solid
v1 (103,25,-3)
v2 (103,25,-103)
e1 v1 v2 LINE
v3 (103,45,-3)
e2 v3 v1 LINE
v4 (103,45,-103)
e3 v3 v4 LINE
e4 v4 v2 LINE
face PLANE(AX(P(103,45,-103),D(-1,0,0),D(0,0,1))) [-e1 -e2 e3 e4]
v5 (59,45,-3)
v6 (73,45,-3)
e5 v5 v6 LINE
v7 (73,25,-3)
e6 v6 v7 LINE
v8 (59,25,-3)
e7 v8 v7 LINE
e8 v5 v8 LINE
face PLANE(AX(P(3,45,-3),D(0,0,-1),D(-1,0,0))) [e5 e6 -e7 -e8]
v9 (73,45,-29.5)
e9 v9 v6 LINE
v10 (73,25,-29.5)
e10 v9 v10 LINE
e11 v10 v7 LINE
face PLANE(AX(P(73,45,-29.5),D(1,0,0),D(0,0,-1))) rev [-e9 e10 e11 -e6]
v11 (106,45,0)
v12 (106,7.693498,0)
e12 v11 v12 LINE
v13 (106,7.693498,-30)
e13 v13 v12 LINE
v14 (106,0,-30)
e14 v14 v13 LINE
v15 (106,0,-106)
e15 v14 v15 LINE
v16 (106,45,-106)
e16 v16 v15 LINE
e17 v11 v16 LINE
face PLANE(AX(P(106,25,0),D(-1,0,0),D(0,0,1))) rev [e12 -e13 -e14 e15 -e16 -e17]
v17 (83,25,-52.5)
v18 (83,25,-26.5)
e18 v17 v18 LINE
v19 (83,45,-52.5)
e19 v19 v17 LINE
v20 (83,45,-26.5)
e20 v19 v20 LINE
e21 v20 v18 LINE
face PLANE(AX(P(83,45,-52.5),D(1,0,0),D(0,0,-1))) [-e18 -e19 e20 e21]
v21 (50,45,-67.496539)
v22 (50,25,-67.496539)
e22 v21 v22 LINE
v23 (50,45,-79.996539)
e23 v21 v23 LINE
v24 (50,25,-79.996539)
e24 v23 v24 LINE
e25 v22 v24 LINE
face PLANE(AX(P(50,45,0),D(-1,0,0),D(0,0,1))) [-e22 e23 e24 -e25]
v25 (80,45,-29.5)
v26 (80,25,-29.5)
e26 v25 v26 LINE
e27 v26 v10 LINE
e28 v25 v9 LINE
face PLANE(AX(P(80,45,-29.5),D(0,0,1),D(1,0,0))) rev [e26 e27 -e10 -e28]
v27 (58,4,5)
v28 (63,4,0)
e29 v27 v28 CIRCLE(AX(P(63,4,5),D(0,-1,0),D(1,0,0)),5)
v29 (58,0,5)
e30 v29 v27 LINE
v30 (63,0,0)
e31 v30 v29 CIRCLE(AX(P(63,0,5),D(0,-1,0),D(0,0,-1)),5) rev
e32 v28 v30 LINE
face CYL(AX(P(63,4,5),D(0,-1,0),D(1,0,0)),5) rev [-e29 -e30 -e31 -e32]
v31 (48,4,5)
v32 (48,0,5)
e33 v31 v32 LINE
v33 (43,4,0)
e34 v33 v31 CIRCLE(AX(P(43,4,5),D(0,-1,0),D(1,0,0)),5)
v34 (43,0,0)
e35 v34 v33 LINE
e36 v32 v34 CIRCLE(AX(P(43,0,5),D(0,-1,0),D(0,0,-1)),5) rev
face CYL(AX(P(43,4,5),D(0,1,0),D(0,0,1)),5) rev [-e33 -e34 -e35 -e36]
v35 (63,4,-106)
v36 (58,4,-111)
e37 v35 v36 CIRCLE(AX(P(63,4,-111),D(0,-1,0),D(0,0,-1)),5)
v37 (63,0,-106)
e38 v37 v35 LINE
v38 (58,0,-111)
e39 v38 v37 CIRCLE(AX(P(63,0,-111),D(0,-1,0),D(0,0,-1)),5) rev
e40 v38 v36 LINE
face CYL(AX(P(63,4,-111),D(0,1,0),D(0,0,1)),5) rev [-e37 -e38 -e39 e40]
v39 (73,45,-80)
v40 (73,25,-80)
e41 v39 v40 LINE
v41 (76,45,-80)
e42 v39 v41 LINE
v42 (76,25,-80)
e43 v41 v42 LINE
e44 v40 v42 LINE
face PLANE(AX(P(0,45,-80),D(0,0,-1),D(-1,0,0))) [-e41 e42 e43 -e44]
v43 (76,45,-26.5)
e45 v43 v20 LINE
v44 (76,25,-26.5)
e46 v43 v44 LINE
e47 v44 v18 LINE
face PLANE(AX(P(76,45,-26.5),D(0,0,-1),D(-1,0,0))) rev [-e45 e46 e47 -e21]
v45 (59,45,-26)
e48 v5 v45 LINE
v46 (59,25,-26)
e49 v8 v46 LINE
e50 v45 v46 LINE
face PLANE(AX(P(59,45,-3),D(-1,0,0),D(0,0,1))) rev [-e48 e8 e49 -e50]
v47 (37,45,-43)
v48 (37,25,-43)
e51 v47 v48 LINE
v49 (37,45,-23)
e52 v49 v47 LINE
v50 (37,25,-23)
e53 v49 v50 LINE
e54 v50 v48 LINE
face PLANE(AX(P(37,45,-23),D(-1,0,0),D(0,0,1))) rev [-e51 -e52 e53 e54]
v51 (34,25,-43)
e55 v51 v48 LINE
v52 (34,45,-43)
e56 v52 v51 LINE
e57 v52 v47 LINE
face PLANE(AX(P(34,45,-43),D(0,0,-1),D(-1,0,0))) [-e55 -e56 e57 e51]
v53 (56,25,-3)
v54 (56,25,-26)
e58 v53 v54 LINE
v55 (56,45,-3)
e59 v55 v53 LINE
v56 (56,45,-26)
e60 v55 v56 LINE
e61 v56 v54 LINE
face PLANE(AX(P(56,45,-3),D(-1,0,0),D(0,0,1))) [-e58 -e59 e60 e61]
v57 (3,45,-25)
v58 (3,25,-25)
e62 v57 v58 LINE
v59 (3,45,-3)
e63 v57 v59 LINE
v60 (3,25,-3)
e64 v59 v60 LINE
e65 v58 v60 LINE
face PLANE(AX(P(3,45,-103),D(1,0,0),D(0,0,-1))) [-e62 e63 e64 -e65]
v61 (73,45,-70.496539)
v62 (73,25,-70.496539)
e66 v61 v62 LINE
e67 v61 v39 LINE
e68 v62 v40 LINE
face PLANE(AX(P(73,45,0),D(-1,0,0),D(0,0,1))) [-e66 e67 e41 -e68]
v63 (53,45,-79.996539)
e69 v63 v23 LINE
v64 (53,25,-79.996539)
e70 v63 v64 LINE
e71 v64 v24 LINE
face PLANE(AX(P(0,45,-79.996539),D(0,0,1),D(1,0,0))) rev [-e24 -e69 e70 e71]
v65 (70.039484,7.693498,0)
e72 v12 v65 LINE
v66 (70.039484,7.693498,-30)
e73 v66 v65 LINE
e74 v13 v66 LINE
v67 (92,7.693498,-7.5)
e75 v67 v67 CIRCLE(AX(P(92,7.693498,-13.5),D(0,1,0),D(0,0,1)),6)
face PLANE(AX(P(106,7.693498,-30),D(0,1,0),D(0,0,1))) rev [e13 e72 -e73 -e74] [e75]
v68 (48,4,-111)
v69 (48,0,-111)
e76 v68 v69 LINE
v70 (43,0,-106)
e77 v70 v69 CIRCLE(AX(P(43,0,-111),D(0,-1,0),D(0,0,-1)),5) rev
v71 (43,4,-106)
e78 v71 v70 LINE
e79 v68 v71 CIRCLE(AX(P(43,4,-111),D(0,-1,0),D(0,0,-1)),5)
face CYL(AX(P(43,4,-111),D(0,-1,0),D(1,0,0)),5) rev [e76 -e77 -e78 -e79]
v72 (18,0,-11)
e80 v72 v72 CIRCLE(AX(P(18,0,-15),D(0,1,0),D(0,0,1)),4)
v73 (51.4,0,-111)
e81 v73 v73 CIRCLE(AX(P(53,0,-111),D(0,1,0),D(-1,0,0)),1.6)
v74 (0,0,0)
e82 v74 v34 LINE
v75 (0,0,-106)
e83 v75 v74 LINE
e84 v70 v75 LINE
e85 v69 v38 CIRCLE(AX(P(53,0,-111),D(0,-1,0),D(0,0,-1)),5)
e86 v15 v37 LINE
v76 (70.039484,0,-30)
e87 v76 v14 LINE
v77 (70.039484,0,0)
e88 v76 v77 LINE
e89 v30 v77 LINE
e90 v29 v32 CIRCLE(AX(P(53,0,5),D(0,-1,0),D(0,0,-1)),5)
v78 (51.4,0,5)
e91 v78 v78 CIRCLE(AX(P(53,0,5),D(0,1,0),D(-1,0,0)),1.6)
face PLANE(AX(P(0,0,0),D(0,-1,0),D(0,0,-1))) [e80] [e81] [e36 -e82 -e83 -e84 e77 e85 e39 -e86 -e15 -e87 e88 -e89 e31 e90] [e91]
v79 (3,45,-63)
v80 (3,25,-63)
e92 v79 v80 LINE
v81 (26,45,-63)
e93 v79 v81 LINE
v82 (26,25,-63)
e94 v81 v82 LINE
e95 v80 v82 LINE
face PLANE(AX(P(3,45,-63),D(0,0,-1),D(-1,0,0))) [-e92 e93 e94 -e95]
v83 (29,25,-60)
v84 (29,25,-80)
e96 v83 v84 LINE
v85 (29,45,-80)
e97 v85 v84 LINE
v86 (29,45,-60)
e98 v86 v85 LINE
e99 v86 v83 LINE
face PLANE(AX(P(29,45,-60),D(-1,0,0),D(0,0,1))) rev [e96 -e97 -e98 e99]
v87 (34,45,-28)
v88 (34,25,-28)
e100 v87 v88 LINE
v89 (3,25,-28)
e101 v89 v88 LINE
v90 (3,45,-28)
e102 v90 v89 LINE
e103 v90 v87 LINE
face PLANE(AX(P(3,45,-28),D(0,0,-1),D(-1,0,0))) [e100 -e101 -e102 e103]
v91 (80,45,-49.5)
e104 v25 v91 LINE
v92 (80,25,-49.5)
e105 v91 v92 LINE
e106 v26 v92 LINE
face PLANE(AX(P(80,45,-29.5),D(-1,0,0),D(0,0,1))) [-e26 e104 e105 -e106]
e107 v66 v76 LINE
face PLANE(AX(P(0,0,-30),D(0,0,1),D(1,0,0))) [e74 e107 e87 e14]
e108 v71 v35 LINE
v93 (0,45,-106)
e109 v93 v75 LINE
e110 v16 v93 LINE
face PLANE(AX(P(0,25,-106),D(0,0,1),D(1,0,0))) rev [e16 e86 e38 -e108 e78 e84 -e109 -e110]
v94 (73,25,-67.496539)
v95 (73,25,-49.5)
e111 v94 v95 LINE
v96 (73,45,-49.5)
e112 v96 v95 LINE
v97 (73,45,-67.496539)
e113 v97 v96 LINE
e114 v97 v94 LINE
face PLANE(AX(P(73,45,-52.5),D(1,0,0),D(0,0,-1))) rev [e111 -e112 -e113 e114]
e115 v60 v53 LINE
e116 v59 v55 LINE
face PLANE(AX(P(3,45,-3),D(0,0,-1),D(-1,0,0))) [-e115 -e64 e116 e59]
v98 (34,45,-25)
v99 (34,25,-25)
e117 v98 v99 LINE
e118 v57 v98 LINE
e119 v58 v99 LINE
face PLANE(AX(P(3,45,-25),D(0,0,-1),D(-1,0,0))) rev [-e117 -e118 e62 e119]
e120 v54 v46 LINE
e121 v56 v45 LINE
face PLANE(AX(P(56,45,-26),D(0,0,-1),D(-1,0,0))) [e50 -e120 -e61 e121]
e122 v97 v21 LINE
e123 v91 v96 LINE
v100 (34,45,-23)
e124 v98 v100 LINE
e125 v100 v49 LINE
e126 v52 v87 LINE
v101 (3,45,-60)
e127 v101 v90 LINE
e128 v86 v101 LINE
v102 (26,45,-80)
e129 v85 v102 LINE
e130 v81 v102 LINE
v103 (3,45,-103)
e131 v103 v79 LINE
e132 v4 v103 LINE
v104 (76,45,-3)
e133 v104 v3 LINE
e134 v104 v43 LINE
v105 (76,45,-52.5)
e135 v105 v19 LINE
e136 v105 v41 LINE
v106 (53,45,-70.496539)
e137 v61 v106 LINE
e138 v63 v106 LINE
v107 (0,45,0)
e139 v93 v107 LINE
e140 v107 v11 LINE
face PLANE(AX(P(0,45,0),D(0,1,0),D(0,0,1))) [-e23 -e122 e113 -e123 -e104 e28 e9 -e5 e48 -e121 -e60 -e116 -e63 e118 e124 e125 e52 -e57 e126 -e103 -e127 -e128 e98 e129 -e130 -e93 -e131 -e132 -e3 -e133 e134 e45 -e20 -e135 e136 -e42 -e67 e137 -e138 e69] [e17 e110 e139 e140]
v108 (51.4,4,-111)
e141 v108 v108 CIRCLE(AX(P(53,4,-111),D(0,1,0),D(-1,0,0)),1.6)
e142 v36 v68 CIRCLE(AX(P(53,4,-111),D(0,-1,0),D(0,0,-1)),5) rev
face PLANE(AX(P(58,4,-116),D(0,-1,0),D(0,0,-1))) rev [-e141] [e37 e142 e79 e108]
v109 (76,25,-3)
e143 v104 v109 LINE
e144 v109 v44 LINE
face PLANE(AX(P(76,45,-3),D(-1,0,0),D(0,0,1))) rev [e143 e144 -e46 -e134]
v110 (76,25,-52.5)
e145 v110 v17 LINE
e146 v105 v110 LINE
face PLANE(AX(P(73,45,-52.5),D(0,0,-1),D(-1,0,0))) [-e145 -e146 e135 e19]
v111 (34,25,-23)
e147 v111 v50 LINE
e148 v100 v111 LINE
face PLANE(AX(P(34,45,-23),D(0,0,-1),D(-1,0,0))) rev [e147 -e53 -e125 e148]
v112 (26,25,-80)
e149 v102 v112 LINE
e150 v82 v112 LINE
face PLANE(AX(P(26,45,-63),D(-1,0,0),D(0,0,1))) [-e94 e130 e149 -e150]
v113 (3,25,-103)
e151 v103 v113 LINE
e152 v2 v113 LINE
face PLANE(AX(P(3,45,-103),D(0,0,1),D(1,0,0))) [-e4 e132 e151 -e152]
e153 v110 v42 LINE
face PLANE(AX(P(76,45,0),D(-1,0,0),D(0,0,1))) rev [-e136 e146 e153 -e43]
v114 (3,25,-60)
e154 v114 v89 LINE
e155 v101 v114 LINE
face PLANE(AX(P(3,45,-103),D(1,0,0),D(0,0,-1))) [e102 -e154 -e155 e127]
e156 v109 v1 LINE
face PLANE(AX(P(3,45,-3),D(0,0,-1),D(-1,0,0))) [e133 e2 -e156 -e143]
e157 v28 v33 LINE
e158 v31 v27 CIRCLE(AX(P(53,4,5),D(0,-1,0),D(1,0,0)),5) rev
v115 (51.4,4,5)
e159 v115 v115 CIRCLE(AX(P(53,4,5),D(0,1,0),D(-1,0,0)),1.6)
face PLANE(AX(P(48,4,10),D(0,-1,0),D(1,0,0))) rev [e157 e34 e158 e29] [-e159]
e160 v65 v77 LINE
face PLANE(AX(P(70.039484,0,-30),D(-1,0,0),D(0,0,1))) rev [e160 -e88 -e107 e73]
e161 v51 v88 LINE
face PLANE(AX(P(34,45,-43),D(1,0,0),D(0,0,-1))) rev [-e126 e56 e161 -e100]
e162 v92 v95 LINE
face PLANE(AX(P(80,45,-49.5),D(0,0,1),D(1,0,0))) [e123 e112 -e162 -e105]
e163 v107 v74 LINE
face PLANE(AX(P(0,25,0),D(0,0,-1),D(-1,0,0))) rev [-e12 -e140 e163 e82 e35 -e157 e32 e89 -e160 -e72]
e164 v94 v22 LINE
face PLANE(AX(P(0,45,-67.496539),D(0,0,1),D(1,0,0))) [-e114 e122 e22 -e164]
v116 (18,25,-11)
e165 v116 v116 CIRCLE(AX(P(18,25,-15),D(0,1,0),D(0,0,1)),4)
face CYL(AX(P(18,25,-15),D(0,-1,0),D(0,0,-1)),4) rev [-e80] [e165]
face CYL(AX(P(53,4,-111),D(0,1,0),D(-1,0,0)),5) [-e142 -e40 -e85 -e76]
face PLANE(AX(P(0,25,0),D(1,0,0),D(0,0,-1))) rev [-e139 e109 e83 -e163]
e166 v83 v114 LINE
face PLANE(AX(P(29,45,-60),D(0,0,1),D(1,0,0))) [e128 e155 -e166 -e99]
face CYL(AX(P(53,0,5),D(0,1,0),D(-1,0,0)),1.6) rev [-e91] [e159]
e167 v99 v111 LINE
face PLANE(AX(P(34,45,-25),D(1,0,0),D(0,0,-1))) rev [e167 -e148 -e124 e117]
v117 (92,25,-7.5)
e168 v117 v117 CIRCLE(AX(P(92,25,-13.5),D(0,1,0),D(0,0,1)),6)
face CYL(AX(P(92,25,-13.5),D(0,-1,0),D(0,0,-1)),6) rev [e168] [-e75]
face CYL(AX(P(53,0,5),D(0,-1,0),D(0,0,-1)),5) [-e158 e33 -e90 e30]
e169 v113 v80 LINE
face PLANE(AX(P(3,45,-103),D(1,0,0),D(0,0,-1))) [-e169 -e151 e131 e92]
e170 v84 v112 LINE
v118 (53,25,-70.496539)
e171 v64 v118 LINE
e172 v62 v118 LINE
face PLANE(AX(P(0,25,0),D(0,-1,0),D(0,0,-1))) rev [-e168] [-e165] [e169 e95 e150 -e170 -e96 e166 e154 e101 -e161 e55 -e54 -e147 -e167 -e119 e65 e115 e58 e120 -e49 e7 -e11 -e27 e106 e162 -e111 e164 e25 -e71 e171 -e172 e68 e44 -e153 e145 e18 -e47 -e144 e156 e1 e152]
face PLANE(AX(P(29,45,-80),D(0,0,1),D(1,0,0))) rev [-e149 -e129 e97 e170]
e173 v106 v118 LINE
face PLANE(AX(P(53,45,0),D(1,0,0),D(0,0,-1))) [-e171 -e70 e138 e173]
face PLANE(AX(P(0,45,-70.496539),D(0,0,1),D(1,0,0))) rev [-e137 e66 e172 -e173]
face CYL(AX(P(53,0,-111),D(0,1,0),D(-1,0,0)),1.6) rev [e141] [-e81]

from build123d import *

# Parameters (mm, degrees)
SKETCH2_W           = 106
SKETCH2_H           = 106
SKETCH2_R           = 4
SKETCH2_R_2         = 6
BOSS_EXTRUDE1_DEPTH = 25
SKETCH3_W           = 106
SKETCH3_H           = 106
SKETCH3_W_2         = 100
SKETCH3_H_2         = 100
BOSS_EXTRUDE2_DEPTH = 20
SKETCH5_W           = 3
SKETCH5_H           = 23
BOSS_EXTRUDE3_DEPTH = 20
SKETCH7_W           = 20
SKETCH7_H           = 3
BOSS_EXTRUDE4_DEPTH = 20
SKETCH10_W          = 10
SKETCH10_H          = 4
BOSS_EXTRUDE5_DEPTH = 10
SKETCH11_W          = 10
SKETCH11_H          = 4
BOSS_EXTRUDE6_DEPTH = 10
FILLET2_RADIUS      = 5
FILLET2_LENGTH      = 4
FILLET3_R           = 5
FILLET4_R           = 5
FILLET5_R           = 5
SKETCH13_R          = 1.6
CUT_EXTRUDE2_DEPTH  = 163.397660082
SKETCH14_W          = 35.96051594
SKETCH14_H          = 7.693498276
CUT_EXTRUDE3_DEPTH  = 30


with BuildPart() as part:
    # Sketch2 → Boss-Extrude1 (new body)
    with BuildSketch(Plane(origin=(0, 0, 0), x_dir=(1, 0, 0), z_dir=(0, 1, 0))):
        with Locations((53, 53)):
            Rectangle(SKETCH2_W, SKETCH2_H)
        with Locations(Location((18, 15, 0), (0, 0, 270))):
            Circle(SKETCH2_R, mode=Mode.SUBTRACT)
        with Locations(Location((92, 13.5, 0), (0, 0, 270))):
            Circle(SKETCH2_R_2, mode=Mode.SUBTRACT)
    extrude(amount=BOSS_EXTRUDE1_DEPTH)

    # Sketch3 → Boss-Extrude2 (add)
    with BuildSketch(Plane(origin=(0, 25, 0), x_dir=(1, 0, 0), z_dir=(0, 1, 0))):
        with Locations((53, 53)):
            Rectangle(SKETCH3_W, SKETCH3_H)
        with Locations((53, 53)):
            Rectangle(SKETCH3_W_2, SKETCH3_H_2, mode=Mode.SUBTRACT)
    extrude(amount=BOSS_EXTRUDE2_DEPTH)

    # Sketch5 → Boss-Extrude3 (add)
    with BuildSketch(Plane(origin=(0, 25, 0), x_dir=(1, 0, 0), z_dir=(0, 1, 0))):
        Polygon((3, 28), (3, 25), (34, 25), (34, 23), (37, 23), (37, 43), (34, 43), (34, 28), align=None)
        Polygon((83, 52.5), (83, 26.5), (76, 26.5), (76, 3), (73, 3), (73, 29.5), (80, 29.5), (80, 49.5), (73, 49.5), (73, 52.5), align=None)
        Polygon((3, 63), (3, 60), (29, 60), (29, 80), (26, 80), (26, 63), align=None)
        with Locations((57.5, 14.5)):
            Rectangle(SKETCH5_W, SKETCH5_H)
    extrude(amount=BOSS_EXTRUDE3_DEPTH)

    # Sketch7 → Boss-Extrude4 (add)
    with BuildSketch(Plane(origin=(0, 25, 0), x_dir=(1, 0, 0), z_dir=(0, 1, 0))):
        Polygon((50, 67.496539), (53, 67.496539), (53, 70.496539), (53, 79.996539), (50, 79.996539), align=None)
        with Locations((63, 68.996539)):
            Rectangle(SKETCH7_W, SKETCH7_H)
        Polygon((73, 67.496539), (73, 52.5), (76, 52.5), (76, 80), (73, 80), (73, 70.496539), align=None)
    extrude(amount=BOSS_EXTRUDE4_DEPTH)

    # Sketch10 → Boss-Extrude5 (add)
    with BuildSketch(Plane.XY):
        with Locations((53, 2)):
            Rectangle(SKETCH10_W, SKETCH10_H)
    extrude(amount=BOSS_EXTRUDE5_DEPTH)

    # Sketch11 → Boss-Extrude6 (add)
    with BuildSketch(Plane(origin=(0, 0, -106), x_dir=(-1, 0, 0), z_dir=(0, 0, -1))):
        with Locations((-53, 2)):
            Rectangle(SKETCH11_W, SKETCH11_H)
    extrude(amount=BOSS_EXTRUDE6_DEPTH)

    # Fillet2: full round fillet: the end face becomes a half cylinder, R = half its width
    fillet2_face = Plane((53, 2, -116), x_dir=(0, -1, 0), z_dir=(0, 0, -1))  # on the end face: x along it, z out of the body
    fillet2_slab = fillet2_face.offset(-FILLET2_RADIUS / 2) * Box(FILLET2_LENGTH, 2 * FILLET2_RADIUS, FILLET2_RADIUS, mode=Mode.PRIVATE)  # the body's end, R deep
    fillet2_round = Plane((53, 2, -111), x_dir=(0, 0, -1), z_dir=(0, -1, 0)) * Cylinder(FILLET2_RADIUS, FILLET2_LENGTH, mode=Mode.PRIVATE)  # its axis R under the face
    add(fillet2_slab - fillet2_round, mode=Mode.SUBTRACT)

    # Fillet3
    fillet3_edges = [part.edges().sort_by_distance(p)[0] for p in [
        (48, 2, -106),
        (58, 2, -106),
    ]]
    fillet(fillet3_edges, radius=FILLET3_R - 0.0001)  # a hair under: the kernel refuses the full size

    # Fillet4
    fillet4_edges = [part.edges().sort_by_distance(p)[0] for p in [
        (48, 2, 0),
        (58, 2, 0),
    ]]
    fillet(fillet4_edges, radius=FILLET4_R)

    # Fillet5
    fillet5_edges = [part.edges().sort_by_distance(p)[0] for p in [
        (48, 2, 10),
        (58, 2, 10),
    ]]
    fillet(fillet5_edges, radius=FILLET5_R - 0.0001)  # a hair under: the kernel refuses the full size

    # Sketch13 → Cut-Extrude2 (cut, through all)
    with BuildSketch(Plane(origin=(0, 4, 0), x_dir=(1, 0, 0), z_dir=(0, 1, 0))):
        with Locations(Location((53, -5, 0), (0, 0, 180))):
            Circle(SKETCH13_R)
        with Locations(Location((53, 111, 0), (0, 0, 180))):
            Circle(SKETCH13_R)
    extrude(amount=-CUT_EXTRUDE2_DEPTH, mode=Mode.SUBTRACT)

    # Sketch14 → Cut-Extrude3 (cut)
    with BuildSketch(Plane.XY):
        with Locations((88.01974203, 3.846749138)):
            Rectangle(SKETCH14_W, SKETCH14_H)
    extrude(amount=-CUT_EXTRUDE3_DEPTH, mode=Mode.SUBTRACT)


solid = part.part
